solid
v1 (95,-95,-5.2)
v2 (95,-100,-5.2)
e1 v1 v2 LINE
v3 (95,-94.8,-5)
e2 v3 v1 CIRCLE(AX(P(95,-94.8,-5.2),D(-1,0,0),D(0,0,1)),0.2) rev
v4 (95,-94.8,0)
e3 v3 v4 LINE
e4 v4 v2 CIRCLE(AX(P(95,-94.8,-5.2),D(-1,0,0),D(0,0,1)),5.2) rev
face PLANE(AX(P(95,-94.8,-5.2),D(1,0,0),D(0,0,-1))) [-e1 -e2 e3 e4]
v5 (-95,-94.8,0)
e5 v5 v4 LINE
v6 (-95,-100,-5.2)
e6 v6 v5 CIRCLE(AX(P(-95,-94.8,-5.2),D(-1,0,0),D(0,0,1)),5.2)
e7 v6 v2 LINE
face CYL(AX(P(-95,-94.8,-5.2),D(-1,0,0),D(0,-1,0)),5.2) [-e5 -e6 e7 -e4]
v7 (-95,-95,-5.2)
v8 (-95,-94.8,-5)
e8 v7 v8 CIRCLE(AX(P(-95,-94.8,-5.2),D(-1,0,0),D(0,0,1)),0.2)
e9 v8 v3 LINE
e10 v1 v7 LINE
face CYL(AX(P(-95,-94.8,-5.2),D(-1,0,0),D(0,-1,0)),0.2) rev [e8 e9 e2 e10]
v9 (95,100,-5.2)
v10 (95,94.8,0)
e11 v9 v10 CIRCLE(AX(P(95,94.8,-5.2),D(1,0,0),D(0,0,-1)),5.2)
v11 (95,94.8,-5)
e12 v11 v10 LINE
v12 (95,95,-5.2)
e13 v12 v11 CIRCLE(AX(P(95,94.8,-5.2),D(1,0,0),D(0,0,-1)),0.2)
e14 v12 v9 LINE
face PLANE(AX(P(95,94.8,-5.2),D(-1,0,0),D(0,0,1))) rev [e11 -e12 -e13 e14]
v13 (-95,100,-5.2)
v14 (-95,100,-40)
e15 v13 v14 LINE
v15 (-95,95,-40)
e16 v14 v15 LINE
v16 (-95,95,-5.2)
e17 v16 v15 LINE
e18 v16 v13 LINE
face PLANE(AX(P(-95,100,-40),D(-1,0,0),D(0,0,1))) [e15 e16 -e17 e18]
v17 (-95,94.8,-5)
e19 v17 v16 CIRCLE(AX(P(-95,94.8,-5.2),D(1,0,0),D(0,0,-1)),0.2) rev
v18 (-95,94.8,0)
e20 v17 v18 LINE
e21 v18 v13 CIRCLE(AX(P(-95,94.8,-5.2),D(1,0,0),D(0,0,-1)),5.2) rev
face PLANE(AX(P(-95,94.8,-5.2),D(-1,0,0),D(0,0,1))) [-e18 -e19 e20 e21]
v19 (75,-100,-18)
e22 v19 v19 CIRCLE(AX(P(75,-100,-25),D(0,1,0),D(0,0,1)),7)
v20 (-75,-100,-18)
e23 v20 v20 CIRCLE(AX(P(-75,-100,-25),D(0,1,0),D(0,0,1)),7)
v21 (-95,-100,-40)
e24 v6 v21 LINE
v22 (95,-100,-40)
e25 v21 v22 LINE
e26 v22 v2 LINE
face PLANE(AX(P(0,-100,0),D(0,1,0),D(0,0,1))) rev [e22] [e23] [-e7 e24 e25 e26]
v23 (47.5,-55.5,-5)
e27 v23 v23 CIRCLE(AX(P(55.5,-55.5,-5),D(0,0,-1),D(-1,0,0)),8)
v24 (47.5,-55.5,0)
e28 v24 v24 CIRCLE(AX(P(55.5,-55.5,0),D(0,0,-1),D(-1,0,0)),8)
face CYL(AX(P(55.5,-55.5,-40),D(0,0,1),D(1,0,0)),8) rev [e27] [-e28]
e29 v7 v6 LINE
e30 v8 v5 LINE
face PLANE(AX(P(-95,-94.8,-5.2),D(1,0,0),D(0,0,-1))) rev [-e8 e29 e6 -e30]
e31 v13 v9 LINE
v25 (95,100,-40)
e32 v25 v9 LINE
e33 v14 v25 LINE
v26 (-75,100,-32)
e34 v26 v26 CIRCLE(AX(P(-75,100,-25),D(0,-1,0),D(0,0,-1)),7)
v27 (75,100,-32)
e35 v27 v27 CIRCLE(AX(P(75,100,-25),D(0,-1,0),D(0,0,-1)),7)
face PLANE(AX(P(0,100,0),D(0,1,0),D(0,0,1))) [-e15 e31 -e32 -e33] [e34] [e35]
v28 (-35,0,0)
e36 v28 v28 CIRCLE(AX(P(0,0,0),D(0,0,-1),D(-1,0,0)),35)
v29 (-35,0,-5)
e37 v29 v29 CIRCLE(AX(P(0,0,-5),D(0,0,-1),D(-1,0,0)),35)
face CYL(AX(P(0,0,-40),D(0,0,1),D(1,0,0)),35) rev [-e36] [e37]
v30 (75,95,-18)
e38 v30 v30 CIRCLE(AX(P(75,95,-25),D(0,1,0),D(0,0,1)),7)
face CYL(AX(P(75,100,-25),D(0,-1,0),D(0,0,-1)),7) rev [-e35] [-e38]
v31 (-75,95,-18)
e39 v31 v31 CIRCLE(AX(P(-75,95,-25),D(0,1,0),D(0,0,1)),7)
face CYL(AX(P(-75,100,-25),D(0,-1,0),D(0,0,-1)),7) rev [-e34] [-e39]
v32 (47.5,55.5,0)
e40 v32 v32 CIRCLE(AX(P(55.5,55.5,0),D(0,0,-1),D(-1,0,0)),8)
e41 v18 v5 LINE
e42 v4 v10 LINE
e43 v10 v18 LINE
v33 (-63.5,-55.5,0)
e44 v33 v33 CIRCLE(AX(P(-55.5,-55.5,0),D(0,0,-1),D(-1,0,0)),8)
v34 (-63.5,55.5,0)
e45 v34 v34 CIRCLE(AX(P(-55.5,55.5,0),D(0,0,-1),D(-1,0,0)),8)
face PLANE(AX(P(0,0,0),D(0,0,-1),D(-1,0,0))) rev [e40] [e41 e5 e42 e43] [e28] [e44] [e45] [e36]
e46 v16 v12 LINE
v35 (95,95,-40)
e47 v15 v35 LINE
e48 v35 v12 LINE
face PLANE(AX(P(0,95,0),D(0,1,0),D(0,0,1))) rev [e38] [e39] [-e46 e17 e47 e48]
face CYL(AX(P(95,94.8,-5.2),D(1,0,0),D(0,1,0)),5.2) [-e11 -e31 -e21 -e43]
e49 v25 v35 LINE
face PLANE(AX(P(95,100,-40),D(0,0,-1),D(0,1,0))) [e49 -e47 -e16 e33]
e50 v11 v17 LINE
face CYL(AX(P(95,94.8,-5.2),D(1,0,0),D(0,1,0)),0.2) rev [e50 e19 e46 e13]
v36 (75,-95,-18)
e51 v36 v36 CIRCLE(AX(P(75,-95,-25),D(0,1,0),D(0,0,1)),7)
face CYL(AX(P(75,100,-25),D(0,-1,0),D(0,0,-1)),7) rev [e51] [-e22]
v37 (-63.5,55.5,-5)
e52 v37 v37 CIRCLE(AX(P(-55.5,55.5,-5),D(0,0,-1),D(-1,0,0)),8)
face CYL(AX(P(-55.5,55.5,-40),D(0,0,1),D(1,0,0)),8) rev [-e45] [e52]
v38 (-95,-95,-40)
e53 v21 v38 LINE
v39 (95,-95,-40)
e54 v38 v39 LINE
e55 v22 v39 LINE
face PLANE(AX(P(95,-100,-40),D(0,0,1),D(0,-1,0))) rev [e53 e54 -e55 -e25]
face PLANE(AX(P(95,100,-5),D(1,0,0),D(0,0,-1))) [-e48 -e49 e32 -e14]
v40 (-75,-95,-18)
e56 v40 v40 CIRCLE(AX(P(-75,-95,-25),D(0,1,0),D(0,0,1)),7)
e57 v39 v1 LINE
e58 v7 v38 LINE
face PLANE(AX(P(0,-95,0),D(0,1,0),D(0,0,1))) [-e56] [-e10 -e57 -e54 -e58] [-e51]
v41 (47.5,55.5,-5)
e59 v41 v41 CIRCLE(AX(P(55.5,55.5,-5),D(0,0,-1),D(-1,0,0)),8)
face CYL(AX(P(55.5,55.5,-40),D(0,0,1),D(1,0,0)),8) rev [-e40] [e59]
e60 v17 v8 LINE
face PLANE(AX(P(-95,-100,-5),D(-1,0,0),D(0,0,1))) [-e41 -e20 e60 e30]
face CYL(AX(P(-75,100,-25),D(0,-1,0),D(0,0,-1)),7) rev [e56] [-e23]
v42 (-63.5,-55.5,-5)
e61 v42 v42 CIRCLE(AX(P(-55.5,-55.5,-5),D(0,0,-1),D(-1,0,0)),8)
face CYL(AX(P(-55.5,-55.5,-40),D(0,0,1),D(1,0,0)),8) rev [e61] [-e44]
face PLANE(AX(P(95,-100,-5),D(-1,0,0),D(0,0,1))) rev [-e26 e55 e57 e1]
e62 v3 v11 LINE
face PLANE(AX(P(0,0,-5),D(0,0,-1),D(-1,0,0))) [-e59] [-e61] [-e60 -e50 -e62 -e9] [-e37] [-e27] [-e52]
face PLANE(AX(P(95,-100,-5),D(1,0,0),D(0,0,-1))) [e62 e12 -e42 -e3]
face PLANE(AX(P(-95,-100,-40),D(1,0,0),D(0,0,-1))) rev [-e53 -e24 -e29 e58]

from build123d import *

# Parameters (mm, degrees)
SKETCH1_W                    = 190
SKETCH1_H                    = 200
BASE_FLANGE1_DEPTH           = 5
EDGE_FLANGE1_STRIP_W         = 20.4
EDGE_FLANGE1_STRIP_H         = 5
EDGE_FLANGE1_STRIP_CUT_DEPTH = 190
EDGE_FLANGE1_DEPTH           = 190
EDGE_FLANGE2_STRIP_W         = 20.4
EDGE_FLANGE2_STRIP_H         = 5
EDGE_FLANGE2_STRIP_CUT_DEPTH = 190
EDGE_FLANGE2_DEPTH           = 190
CUT_EXTRUDE1_DEPTH           = 144.614066163
CUT_EXTRUDE1_DEPTH_BACK      = 144.614066163
SKETCH12_R                   = 35
CUT_EXTRUDE2_DEPTH           = 144.614066163
CUT_EXTRUDE2_DEPTH_BACK      = 144.614066163
SKETCH13_R                   = 8
CUT_EXTRUDE3_DEPTH           = 226
CUT_EXTRUDE3_DEPTH_BACK      = 226
SKETCH14_R                   = 7


# Sheet-metal steps are written as plain solids
with BuildPart() as part:
    # Sketch1 → Base-Flange1 (new body)
    with BuildSketch(Plane.XY):
        Rectangle(SKETCH1_W, SKETCH1_H)
    extrude(amount=-BASE_FLANGE1_DEPTH)

    # Edge-Flange1 strip (across the edge) → Edge-Flange1 strip cut (cut)
    with BuildSketch(Plane(origin=(-95, 100, -5), x_dir=(0, -1, 0), z_dir=(1, 0, 0))):
        with Locations((-5, -2.5)):
            Rectangle(EDGE_FLANGE1_STRIP_W, EDGE_FLANGE1_STRIP_H)
    extrude(amount=EDGE_FLANGE1_STRIP_CUT_DEPTH, mode=Mode.SUBTRACT)

    # Edge-Flange1 section (across the edge) → Edge-Flange1 (add)
    with BuildSketch(Plane(origin=(-95, 100, -5), x_dir=(0, -1, 0), z_dir=(1, 0, 0))):
        with BuildLine():
            Line((0, 0.2), (0, 35))
            Line((0, 35), (5, 35))
            Line((5, 35), (5, 0.2))
            ThreePointArc((5, 0.2), (5.058578644, 0.058578644), (5.2, 0))
            Line((5.2, 0), (5.2, -5))
            ThreePointArc((5.2, -5), (1.523044738, -3.476955262), (0, 0.2))
        make_face()
    extrude(amount=EDGE_FLANGE1_DEPTH)

    # Edge-Flange2 strip (across the edge) → Edge-Flange2 strip cut (cut)
    with BuildSketch(Plane(origin=(95, -100, -5), x_dir=(0, 1, 0), z_dir=(-1, 0, 0))):
        with Locations((-5, -2.5)):
            Rectangle(EDGE_FLANGE2_STRIP_W, EDGE_FLANGE2_STRIP_H)
    extrude(amount=EDGE_FLANGE2_STRIP_CUT_DEPTH, mode=Mode.SUBTRACT)

    # Edge-Flange2 section (across the edge) → Edge-Flange2 (add)
    with BuildSketch(Plane(origin=(95, -100, -5), x_dir=(0, 1, 0), z_dir=(-1, 0, 0))):
        with BuildLine():
            Line((0, 0.2), (0, 35))
            Line((0, 35), (5, 35))
            Line((5, 35), (5, 0.2))
            ThreePointArc((5, 0.2), (5.058578644, 0.058578644), (5.2, 0))
            Line((5.2, 0), (5.2, -5))
            ThreePointArc((5.2, -5), (1.523044738, -3.476955262), (0, 0.2))
        make_face()
    extrude(amount=EDGE_FLANGE2_DEPTH)

    # Sketch12 → Cut-Extrude1 (cut, two sides: drawn at the far end of the back side and taken through both)
    with BuildSketch(Plane.XY.offset(-CUT_EXTRUDE1_DEPTH_BACK)):
        with Locations(Location((0, 0, 0), (0, 0, 180))):
            Circle(SKETCH12_R)
    extrude(amount=CUT_EXTRUDE1_DEPTH + CUT_EXTRUDE1_DEPTH_BACK, mode=Mode.SUBTRACT)

    # Sketch13 → Cut-Extrude2 (cut, two sides: drawn at the far end of the back side and taken through both)
    with BuildSketch(Plane.XY.offset(-CUT_EXTRUDE2_DEPTH_BACK)):
        with Locations(Location((55.5, 55.5, 0), (0, 0, 180))):
            Circle(SKETCH13_R)
        with Locations(Location((-55.5, 55.5, 0), (0, 0, 180))):
            Circle(SKETCH13_R)
        with Locations(Location((-55.5, -55.5, 0), (0, 0, 180))):
            Circle(SKETCH13_R)
        with Locations(Location((55.5, -55.5, 0), (0, 0, 180))):
            Circle(SKETCH13_R)
    extrude(amount=CUT_EXTRUDE2_DEPTH + CUT_EXTRUDE2_DEPTH_BACK, mode=Mode.SUBTRACT)

    # Sketch14 → Cut-Extrude3 (cut, two sides: drawn at the far end of the back side and taken through both)
    with BuildSketch(Plane(origin=(0, -100, 0), x_dir=(-1, 0, 0), z_dir=(0, -1, 0)).offset(-CUT_EXTRUDE3_DEPTH_BACK)):
        with Locations(Location((75, 25, 0), (0, 0, 270))):
            Circle(SKETCH14_R)
        with Locations(Location((-75, 25, 0), (0, 0, 270))):
            Circle(SKETCH14_R)
    extrude(amount=CUT_EXTRUDE3_DEPTH + CUT_EXTRUDE3_DEPTH_BACK, mode=Mode.SUBTRACT)


solid = part.part
